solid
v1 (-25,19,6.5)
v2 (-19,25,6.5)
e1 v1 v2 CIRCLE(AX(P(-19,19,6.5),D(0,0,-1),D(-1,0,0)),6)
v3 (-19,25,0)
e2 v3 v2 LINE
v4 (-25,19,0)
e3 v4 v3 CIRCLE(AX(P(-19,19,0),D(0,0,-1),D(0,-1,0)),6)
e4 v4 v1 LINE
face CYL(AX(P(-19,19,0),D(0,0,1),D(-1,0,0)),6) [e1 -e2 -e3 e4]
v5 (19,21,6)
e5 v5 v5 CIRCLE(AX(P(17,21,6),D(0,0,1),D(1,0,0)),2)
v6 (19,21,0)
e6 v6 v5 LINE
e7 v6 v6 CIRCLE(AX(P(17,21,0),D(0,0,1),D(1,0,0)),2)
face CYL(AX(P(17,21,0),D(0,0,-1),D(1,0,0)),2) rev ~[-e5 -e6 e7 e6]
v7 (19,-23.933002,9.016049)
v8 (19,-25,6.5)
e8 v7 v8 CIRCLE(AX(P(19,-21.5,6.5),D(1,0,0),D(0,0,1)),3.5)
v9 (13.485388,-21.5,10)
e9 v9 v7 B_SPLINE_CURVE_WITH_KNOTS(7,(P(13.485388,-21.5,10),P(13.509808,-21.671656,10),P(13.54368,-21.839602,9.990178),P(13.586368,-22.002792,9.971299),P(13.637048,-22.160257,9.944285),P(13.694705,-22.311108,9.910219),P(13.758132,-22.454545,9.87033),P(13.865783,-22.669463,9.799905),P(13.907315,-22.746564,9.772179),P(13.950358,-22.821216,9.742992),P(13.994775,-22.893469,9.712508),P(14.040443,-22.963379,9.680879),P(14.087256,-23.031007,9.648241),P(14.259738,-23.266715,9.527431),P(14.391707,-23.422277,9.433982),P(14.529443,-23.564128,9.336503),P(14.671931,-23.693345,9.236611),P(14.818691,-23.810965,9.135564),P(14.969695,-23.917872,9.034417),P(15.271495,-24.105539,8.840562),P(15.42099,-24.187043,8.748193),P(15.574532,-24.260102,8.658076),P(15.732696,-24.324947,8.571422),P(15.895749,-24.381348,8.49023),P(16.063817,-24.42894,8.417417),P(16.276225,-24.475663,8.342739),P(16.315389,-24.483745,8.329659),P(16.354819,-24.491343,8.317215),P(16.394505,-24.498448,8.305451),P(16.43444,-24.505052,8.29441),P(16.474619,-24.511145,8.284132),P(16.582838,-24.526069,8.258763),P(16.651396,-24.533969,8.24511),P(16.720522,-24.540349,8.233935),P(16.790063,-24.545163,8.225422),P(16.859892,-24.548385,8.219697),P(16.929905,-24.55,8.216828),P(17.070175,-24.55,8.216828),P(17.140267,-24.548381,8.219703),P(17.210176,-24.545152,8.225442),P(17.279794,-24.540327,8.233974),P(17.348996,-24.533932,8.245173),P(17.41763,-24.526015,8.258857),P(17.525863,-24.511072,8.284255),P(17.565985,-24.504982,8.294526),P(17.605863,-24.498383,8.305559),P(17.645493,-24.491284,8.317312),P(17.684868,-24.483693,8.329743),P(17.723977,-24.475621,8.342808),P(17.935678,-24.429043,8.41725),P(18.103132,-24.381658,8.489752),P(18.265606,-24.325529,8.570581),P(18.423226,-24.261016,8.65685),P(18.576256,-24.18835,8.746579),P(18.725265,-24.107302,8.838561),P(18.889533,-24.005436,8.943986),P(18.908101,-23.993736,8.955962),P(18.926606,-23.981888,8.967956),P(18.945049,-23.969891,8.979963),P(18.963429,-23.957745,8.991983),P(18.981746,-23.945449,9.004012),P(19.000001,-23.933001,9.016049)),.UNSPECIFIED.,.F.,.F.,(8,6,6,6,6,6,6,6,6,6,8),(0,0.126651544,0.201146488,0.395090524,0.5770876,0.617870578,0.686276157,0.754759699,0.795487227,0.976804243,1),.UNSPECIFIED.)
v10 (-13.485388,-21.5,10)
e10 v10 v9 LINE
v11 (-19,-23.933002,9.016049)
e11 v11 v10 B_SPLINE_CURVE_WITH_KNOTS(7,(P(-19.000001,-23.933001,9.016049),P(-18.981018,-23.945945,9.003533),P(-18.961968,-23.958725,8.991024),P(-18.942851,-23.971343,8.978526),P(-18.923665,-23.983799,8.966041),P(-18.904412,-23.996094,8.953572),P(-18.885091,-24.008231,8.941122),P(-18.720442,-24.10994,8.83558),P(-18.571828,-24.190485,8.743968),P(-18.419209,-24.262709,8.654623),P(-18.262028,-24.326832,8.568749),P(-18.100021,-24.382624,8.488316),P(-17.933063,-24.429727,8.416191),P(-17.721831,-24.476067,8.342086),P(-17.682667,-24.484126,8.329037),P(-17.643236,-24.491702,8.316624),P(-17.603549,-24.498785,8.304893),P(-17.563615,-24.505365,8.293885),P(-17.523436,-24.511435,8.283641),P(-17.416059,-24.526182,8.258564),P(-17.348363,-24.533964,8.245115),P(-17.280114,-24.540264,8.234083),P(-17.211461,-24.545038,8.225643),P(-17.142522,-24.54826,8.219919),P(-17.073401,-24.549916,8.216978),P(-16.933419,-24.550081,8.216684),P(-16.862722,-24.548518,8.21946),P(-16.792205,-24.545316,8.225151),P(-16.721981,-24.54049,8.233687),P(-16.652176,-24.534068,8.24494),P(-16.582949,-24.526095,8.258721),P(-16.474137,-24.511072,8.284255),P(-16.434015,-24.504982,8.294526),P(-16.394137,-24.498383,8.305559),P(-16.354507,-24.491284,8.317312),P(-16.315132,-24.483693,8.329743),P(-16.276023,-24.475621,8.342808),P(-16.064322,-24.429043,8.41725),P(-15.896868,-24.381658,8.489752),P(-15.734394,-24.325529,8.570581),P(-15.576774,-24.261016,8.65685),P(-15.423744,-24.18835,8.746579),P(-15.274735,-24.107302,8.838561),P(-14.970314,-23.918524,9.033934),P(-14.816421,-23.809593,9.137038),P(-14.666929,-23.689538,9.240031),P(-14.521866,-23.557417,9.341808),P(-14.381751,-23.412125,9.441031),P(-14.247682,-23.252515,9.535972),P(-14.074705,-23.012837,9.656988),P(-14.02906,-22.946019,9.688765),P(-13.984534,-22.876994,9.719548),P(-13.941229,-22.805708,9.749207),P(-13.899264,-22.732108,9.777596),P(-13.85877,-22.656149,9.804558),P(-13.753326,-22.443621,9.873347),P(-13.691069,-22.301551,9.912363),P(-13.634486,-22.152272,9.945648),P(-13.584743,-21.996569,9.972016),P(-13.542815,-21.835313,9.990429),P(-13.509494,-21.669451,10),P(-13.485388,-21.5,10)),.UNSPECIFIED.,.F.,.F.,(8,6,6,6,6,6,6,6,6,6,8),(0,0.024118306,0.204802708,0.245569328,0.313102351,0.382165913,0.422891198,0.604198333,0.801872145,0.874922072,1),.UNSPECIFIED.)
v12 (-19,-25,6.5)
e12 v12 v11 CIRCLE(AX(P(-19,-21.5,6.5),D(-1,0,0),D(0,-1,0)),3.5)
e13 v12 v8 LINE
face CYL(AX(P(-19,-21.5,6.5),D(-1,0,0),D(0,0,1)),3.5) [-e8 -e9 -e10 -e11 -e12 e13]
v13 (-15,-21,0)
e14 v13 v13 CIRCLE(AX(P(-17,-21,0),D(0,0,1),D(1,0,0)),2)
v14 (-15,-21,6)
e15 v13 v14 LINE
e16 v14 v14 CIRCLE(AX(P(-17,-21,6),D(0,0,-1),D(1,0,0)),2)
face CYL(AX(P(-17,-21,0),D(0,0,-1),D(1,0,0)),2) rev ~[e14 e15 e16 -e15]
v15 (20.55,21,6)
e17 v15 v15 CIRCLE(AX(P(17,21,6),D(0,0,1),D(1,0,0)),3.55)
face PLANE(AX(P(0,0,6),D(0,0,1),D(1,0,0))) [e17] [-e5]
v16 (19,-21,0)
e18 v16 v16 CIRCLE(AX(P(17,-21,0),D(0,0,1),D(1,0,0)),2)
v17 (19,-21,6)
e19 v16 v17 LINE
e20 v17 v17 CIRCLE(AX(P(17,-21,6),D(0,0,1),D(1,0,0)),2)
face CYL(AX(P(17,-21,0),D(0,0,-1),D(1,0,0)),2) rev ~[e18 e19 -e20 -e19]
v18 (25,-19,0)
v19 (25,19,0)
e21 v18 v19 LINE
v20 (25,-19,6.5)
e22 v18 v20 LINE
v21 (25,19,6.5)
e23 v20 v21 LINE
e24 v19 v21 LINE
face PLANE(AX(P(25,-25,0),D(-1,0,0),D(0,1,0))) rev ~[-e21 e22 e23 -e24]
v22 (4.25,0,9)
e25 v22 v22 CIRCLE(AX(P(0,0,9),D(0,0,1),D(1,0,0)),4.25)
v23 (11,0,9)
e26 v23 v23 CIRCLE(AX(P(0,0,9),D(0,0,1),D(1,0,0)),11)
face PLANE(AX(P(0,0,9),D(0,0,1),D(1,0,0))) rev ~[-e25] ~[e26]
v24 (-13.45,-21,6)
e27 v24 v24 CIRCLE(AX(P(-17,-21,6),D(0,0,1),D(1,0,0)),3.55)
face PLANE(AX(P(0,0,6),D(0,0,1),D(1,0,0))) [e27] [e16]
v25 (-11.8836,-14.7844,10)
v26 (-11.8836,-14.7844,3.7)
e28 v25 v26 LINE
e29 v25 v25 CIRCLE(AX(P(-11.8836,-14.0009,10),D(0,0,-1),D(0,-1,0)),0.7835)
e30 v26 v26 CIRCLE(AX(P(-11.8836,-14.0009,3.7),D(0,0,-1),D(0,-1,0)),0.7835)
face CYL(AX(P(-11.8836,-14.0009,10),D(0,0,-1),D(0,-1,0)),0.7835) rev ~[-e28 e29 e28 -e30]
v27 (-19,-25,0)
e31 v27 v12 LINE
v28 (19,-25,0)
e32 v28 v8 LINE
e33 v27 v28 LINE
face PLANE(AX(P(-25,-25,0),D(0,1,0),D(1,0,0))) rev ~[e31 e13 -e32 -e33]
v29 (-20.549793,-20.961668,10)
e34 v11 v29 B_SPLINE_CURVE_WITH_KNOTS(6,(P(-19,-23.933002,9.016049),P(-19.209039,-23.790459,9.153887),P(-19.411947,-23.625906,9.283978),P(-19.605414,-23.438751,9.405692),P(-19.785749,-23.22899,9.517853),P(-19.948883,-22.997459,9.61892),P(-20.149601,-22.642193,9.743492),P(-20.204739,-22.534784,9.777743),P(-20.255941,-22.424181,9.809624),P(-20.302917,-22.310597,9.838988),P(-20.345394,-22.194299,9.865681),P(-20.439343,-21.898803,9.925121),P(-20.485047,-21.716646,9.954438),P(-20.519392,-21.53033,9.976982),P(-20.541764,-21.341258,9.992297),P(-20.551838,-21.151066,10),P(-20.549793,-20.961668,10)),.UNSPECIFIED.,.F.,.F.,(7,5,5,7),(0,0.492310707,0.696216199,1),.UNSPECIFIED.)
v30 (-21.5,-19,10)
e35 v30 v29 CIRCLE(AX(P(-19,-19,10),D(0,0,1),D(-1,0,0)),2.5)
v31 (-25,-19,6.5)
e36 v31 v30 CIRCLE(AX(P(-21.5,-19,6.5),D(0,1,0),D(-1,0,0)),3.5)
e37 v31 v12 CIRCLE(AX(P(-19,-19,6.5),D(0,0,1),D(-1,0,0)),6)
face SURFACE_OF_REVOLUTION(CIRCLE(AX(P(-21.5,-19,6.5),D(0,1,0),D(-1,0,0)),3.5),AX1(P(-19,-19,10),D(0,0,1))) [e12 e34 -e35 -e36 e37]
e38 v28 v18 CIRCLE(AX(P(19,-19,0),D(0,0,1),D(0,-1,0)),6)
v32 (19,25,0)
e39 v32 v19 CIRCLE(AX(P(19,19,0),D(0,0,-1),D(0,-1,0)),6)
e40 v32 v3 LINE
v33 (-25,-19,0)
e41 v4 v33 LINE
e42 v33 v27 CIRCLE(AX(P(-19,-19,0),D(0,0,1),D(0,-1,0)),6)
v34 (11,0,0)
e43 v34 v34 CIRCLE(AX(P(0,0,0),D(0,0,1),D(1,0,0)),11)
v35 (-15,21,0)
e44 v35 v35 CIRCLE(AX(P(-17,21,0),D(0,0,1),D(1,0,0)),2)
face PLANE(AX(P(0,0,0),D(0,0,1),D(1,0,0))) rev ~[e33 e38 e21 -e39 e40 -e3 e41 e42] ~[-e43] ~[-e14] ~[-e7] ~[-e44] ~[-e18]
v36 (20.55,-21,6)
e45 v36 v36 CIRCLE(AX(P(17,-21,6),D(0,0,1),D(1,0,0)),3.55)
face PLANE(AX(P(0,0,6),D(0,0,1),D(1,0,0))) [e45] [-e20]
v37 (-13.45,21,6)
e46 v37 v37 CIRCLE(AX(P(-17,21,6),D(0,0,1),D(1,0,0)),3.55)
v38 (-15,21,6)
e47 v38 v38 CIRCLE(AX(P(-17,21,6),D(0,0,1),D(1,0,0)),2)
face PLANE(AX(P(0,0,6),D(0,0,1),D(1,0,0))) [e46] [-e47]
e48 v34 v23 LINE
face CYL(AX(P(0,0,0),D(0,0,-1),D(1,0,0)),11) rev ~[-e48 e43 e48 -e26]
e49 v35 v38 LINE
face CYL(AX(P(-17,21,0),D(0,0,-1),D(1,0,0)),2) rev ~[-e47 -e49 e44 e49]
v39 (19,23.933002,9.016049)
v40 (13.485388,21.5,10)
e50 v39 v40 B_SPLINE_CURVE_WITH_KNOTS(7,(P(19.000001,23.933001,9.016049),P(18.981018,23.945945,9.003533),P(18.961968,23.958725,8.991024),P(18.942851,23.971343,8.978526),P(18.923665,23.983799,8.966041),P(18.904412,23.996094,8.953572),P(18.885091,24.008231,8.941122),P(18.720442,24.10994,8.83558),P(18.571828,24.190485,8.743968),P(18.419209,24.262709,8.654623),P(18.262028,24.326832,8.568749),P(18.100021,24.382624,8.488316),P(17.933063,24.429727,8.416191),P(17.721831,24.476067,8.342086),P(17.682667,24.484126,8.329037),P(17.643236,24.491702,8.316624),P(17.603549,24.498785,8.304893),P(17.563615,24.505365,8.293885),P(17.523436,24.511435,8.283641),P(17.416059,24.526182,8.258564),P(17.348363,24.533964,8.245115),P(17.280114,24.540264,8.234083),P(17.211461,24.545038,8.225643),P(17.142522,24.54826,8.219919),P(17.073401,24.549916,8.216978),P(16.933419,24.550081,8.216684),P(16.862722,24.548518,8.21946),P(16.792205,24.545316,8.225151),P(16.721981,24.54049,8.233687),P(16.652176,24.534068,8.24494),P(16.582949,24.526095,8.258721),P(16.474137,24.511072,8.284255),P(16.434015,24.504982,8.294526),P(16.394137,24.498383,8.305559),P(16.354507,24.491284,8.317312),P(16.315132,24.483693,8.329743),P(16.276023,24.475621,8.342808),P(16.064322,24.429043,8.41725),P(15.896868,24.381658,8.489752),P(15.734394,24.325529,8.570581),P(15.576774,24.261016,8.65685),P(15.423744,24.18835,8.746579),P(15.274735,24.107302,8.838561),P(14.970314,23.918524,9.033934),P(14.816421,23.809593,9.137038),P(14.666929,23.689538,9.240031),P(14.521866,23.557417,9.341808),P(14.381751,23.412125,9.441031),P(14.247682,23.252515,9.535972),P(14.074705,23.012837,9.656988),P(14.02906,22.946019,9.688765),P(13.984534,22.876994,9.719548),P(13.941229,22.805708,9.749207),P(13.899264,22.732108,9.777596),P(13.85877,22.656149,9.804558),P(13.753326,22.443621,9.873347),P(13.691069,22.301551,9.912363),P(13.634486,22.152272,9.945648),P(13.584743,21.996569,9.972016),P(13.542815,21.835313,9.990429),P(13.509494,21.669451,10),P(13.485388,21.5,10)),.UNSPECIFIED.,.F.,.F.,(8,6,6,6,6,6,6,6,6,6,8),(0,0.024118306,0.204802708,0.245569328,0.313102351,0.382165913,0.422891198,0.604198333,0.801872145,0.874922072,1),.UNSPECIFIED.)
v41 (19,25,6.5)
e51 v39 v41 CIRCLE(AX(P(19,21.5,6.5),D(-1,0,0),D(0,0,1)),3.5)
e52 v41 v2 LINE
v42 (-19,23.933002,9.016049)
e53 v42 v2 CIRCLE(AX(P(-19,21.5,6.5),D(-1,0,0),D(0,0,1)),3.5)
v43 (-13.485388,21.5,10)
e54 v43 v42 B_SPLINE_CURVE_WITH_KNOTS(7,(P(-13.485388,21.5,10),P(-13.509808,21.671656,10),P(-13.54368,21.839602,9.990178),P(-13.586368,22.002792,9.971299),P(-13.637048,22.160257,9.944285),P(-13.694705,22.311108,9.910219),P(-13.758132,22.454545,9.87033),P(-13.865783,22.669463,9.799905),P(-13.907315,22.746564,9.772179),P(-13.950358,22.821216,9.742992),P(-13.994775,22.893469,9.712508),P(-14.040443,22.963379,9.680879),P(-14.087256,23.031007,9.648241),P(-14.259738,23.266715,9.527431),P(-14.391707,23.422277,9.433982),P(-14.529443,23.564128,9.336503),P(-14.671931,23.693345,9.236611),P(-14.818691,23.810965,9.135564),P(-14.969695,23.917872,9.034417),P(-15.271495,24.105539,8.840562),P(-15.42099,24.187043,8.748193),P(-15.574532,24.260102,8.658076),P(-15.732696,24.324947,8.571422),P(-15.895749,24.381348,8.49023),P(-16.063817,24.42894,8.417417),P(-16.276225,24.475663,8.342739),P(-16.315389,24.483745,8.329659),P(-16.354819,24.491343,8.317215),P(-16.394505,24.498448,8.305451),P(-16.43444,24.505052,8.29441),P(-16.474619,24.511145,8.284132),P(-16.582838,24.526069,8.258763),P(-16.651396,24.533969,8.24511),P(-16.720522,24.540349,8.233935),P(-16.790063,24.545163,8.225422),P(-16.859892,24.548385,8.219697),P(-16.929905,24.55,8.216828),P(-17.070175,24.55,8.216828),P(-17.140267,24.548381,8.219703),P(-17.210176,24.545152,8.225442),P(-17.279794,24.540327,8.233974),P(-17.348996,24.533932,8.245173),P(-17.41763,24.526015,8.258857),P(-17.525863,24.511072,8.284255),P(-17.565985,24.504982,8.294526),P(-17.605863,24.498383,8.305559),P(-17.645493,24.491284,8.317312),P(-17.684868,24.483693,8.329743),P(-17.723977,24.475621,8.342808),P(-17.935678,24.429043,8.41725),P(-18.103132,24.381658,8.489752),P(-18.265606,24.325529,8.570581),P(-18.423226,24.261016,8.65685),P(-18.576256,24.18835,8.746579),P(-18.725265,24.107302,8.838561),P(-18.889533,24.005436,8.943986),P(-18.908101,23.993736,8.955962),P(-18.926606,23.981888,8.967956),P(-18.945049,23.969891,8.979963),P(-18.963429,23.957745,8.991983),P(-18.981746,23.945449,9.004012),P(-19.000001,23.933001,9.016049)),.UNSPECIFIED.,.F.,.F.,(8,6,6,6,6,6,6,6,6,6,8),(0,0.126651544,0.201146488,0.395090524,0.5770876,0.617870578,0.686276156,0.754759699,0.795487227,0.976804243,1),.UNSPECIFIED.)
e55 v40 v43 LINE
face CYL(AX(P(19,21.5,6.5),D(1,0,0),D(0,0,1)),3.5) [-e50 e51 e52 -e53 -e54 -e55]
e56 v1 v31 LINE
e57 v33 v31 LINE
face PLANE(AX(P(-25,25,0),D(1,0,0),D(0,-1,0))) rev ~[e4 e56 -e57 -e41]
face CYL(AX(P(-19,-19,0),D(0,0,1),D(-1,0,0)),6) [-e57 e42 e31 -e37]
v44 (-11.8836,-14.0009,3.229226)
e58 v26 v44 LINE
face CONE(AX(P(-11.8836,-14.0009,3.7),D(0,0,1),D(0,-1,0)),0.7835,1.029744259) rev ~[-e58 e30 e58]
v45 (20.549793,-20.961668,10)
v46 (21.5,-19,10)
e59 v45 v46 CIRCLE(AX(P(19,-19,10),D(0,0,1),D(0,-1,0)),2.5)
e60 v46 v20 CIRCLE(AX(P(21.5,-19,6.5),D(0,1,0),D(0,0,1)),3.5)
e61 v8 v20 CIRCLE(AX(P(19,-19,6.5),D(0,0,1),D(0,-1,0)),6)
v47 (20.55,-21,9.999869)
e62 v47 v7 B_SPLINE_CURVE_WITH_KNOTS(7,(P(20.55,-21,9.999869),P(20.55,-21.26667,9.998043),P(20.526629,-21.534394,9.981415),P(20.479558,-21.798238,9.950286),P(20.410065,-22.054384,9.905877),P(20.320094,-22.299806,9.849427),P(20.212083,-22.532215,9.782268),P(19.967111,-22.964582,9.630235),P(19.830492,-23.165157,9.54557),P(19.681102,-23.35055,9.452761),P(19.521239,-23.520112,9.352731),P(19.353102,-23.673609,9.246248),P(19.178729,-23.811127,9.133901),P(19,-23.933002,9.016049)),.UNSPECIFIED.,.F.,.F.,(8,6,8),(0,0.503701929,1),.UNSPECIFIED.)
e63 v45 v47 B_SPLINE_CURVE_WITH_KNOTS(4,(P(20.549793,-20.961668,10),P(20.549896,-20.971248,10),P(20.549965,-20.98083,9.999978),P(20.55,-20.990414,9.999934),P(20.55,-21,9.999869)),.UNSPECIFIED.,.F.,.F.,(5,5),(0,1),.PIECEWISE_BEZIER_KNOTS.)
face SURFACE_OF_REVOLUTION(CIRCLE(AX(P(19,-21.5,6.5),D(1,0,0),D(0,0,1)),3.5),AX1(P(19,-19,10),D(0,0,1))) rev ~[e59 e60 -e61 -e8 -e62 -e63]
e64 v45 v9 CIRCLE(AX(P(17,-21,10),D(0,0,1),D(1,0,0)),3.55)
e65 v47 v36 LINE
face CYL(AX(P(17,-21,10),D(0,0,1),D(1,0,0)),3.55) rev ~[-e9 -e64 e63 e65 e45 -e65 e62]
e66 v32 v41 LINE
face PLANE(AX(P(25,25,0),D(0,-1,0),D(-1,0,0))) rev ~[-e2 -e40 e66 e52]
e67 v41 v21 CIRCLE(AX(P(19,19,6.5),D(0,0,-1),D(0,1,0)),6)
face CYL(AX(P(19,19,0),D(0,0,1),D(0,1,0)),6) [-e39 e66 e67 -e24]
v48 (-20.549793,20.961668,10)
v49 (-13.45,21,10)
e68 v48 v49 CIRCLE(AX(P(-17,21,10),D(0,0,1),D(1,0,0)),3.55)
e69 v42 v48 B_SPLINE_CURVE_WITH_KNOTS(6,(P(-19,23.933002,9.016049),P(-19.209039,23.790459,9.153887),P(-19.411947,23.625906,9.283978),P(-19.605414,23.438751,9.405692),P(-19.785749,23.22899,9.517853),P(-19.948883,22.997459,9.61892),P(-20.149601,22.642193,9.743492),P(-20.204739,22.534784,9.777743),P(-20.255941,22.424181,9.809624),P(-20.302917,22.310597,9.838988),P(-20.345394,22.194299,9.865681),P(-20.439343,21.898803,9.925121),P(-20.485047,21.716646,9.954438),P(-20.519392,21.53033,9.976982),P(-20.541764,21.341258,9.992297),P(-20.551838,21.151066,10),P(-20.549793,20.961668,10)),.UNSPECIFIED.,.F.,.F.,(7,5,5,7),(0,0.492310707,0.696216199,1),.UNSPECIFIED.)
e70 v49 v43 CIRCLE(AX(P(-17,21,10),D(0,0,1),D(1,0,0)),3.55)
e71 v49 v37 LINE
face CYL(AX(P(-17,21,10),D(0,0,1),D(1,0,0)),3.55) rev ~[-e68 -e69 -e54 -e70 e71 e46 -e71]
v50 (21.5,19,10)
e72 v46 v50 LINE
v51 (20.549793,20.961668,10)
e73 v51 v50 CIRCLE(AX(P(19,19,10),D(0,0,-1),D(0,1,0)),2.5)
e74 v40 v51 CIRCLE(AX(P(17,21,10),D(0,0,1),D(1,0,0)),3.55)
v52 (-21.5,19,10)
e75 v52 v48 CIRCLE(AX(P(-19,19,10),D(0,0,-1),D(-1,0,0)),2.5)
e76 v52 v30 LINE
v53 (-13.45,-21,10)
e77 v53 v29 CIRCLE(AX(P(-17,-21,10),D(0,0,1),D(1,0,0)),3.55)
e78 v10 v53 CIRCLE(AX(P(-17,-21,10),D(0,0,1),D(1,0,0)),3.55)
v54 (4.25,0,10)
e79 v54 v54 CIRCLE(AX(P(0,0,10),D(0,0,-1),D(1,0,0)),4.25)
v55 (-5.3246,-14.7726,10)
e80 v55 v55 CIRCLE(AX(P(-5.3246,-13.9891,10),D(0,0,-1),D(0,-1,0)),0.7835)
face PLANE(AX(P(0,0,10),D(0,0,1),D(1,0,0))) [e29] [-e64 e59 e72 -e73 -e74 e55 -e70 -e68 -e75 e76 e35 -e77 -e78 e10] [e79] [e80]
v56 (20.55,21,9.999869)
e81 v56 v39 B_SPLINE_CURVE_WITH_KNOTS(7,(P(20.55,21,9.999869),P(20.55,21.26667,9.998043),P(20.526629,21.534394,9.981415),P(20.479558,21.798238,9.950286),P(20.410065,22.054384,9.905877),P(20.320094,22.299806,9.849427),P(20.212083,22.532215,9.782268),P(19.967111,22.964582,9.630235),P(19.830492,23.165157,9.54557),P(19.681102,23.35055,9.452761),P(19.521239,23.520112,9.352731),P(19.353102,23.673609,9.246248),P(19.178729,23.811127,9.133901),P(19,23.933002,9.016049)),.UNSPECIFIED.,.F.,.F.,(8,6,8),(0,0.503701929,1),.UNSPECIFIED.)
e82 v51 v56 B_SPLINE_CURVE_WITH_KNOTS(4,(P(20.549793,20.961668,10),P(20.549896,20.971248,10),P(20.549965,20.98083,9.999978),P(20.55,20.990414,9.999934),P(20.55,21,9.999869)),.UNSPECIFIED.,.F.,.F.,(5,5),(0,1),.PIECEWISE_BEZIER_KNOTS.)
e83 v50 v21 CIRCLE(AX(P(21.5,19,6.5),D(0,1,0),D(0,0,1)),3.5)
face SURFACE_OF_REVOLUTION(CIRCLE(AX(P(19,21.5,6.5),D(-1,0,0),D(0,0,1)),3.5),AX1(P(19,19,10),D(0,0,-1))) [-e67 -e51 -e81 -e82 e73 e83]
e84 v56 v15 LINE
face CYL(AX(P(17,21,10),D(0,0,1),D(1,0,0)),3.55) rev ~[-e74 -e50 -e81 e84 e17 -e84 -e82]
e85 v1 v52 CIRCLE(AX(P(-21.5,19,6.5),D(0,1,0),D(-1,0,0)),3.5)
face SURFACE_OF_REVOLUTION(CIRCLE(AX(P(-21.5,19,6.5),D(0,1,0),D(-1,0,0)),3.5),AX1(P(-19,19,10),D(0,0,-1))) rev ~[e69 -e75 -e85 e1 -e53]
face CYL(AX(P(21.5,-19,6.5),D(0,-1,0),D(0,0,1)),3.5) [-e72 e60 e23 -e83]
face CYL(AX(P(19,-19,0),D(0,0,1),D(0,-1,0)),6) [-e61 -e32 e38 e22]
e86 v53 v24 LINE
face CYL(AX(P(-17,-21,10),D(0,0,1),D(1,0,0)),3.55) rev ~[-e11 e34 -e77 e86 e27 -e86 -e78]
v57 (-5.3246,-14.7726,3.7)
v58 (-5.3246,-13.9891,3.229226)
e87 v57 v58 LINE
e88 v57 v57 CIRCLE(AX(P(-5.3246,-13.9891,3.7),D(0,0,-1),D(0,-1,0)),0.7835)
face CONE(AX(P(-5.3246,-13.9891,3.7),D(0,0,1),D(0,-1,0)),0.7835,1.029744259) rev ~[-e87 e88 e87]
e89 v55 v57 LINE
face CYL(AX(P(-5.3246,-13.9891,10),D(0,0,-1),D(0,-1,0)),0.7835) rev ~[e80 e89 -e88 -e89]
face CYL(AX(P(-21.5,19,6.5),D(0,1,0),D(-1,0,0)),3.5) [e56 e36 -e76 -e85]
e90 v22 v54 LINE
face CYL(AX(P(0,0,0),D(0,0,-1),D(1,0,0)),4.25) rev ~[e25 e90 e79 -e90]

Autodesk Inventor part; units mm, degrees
ref_plane "YZ Plane" through (0, 0, 0) normal (1, 0, 0) x (0, 1, 0)
ref_plane "XZ Plane" through (0, 0, 0) normal (0, 1, 0) x (-1, 0, 0)
ref_plane "XY Plane" through (0, 0, 0) normal (0, 0, 1) x (1, 0, 0)
sketch "Sketch1" plane through (0, 0, 0) normal (0, 0, 1) x (1, 0, 0)
  line L0 (-25, -25) -> (25, -25)
  line L1 (25, -25) -> (25, 25)
  line L2 (25, 25) -> (-25, 25)
  line L3 (-25, 25) -> (-25, -25)
  line L4 (-25, -25) -> (25, 25) construction
  line L5 (25, -25) -> (-25, 25) construction
  line L6 (-15, 15) -> (15, 15)
  line L7 (15, 15) -> (15, -15)
  line L8 (15, -15) -> (-15, -15)
  line L9 (-15, -15) -> (-15, 15)
  circle A0 centre (0, 0) radius 11
  circle A1 centre (0, 0) radius 4.25
  circle A2 centre (-17, 21) radius 2
  circle A3 centre (17, 21) radius 2
  circle A4 centre (-17, -21) radius 2
  circle A5 centre (17, -21) radius 2
  dimension "d0" = 50
  dimension "d1" = 50
  dimension "d2" = 10
  dimension "d3" = 22
  dimension "d4" = 8.5
  dimension "d19" = 4
  dimension "d20" = 4
  dimension "d23" = 34
  dimension "d26" = 42
  dimension "d32" = 8
extrude "Extrusion1" add sketch "Sketch1" along normal blind 10 contours L3 L2 L1 L0 | L6 L7 L8 L9 | A0 | A1 | A2 | A3 | A4 | A5
extrude "Extrusion3" cut sketch "Sketch1" along normal blind 9 contours A0
extrude "Extrusion4" cut sketch "Sketch1" along normal through all contours A2 | A3 | A4 | A5
extrude "Extrusion7" cut sketch "Sketch1" along normal through all contours A1
fillet "Fillet1" radius 6 4 edges at (-25, 25, 5) (-25, -25, 5) (25, 25, 5) (25, -25, 5)
sketch "Sketch4" plane through (0, 0, 10) normal (0, 0, 1) x (1, 0, 0)
  circle A0 centre (0, 0) radius 11 projected
  arc A1 (19, -25) -> (25, -19) centre (19, -19) ccw projected
  line L0 (25, -19) -> (25, 19) projected
  arc A2 (25, 19) -> (19, 25) centre (19, 19) ccw projected
  line L1 (19, 25) -> (-19, 25) projected
  arc A3 (-19, 25) -> (-25, 19) centre (-19, 19) ccw projected
  line L2 (-25, 19) -> (-25, -19) projected
  arc A4 (-25, -19) -> (-19, -25) centre (-19, -19) ccw projected
  line L3 (-19, -25) -> (19, -25) projected
  circle A5 centre (17, -21) radius 2 projected
  circle A6 centre (-17, -21) radius 2 projected
  circle A7 centre (17, 21) radius 2 projected
  circle A8 centre (-17, 21) radius 2 projected
  circle A9 centre (17, -21) radius 3.55
  circle A10 centre (-17, -21) radius 2 projected
  circle A11 centre (-17, -21) radius 3.55
  circle A12 centre (-17, 21) radius 3.55
  circle A13 centre (17, 21) radius 3.55
  dimension "d46" = 7.1
extrude "Extrusion9" cut sketch "Sketch4" against normal blind 4 contours A6 | A9 | A11 | A12 | A13
fillet "Fillet3" radius 3.5 8 edges at (-23.2426, -23.2426, 10) (0, -25, 10) (23.2426, -23.2426, 10) (25, 0, 10) (23.2426, 23.2426, 10) (0, 25, 10) (-23.2426, 23.2426, 10) (-25, 0, 10)
sketch "Sketch6" plane through (0, 0, 10) normal (0, 0, 1) x (1, 0, 0)
  point P0 (0, 0)
  point P1 (-5.3246, -13.9891)
  point P2 (-11.8716, -14.0197)
  point P3 (-11.7716, -13.9768)
  point P4 (-11.8836, -14.0009)
hole "Hole1" at (-5.3246, -13.9891, 10) at (-11.8836, -14.0009, 10) direction (0, 0, -1) diameter 1.567 depth 6.3 tip angle 118 thread size "M2x0.4" class "6H" standard "ISO Metric profile"
equation "\"d23\" = d1 - 2 * d32"
equation "\"d26\" = d0 - 2 * d20"
properties part number "gearbox v2"
